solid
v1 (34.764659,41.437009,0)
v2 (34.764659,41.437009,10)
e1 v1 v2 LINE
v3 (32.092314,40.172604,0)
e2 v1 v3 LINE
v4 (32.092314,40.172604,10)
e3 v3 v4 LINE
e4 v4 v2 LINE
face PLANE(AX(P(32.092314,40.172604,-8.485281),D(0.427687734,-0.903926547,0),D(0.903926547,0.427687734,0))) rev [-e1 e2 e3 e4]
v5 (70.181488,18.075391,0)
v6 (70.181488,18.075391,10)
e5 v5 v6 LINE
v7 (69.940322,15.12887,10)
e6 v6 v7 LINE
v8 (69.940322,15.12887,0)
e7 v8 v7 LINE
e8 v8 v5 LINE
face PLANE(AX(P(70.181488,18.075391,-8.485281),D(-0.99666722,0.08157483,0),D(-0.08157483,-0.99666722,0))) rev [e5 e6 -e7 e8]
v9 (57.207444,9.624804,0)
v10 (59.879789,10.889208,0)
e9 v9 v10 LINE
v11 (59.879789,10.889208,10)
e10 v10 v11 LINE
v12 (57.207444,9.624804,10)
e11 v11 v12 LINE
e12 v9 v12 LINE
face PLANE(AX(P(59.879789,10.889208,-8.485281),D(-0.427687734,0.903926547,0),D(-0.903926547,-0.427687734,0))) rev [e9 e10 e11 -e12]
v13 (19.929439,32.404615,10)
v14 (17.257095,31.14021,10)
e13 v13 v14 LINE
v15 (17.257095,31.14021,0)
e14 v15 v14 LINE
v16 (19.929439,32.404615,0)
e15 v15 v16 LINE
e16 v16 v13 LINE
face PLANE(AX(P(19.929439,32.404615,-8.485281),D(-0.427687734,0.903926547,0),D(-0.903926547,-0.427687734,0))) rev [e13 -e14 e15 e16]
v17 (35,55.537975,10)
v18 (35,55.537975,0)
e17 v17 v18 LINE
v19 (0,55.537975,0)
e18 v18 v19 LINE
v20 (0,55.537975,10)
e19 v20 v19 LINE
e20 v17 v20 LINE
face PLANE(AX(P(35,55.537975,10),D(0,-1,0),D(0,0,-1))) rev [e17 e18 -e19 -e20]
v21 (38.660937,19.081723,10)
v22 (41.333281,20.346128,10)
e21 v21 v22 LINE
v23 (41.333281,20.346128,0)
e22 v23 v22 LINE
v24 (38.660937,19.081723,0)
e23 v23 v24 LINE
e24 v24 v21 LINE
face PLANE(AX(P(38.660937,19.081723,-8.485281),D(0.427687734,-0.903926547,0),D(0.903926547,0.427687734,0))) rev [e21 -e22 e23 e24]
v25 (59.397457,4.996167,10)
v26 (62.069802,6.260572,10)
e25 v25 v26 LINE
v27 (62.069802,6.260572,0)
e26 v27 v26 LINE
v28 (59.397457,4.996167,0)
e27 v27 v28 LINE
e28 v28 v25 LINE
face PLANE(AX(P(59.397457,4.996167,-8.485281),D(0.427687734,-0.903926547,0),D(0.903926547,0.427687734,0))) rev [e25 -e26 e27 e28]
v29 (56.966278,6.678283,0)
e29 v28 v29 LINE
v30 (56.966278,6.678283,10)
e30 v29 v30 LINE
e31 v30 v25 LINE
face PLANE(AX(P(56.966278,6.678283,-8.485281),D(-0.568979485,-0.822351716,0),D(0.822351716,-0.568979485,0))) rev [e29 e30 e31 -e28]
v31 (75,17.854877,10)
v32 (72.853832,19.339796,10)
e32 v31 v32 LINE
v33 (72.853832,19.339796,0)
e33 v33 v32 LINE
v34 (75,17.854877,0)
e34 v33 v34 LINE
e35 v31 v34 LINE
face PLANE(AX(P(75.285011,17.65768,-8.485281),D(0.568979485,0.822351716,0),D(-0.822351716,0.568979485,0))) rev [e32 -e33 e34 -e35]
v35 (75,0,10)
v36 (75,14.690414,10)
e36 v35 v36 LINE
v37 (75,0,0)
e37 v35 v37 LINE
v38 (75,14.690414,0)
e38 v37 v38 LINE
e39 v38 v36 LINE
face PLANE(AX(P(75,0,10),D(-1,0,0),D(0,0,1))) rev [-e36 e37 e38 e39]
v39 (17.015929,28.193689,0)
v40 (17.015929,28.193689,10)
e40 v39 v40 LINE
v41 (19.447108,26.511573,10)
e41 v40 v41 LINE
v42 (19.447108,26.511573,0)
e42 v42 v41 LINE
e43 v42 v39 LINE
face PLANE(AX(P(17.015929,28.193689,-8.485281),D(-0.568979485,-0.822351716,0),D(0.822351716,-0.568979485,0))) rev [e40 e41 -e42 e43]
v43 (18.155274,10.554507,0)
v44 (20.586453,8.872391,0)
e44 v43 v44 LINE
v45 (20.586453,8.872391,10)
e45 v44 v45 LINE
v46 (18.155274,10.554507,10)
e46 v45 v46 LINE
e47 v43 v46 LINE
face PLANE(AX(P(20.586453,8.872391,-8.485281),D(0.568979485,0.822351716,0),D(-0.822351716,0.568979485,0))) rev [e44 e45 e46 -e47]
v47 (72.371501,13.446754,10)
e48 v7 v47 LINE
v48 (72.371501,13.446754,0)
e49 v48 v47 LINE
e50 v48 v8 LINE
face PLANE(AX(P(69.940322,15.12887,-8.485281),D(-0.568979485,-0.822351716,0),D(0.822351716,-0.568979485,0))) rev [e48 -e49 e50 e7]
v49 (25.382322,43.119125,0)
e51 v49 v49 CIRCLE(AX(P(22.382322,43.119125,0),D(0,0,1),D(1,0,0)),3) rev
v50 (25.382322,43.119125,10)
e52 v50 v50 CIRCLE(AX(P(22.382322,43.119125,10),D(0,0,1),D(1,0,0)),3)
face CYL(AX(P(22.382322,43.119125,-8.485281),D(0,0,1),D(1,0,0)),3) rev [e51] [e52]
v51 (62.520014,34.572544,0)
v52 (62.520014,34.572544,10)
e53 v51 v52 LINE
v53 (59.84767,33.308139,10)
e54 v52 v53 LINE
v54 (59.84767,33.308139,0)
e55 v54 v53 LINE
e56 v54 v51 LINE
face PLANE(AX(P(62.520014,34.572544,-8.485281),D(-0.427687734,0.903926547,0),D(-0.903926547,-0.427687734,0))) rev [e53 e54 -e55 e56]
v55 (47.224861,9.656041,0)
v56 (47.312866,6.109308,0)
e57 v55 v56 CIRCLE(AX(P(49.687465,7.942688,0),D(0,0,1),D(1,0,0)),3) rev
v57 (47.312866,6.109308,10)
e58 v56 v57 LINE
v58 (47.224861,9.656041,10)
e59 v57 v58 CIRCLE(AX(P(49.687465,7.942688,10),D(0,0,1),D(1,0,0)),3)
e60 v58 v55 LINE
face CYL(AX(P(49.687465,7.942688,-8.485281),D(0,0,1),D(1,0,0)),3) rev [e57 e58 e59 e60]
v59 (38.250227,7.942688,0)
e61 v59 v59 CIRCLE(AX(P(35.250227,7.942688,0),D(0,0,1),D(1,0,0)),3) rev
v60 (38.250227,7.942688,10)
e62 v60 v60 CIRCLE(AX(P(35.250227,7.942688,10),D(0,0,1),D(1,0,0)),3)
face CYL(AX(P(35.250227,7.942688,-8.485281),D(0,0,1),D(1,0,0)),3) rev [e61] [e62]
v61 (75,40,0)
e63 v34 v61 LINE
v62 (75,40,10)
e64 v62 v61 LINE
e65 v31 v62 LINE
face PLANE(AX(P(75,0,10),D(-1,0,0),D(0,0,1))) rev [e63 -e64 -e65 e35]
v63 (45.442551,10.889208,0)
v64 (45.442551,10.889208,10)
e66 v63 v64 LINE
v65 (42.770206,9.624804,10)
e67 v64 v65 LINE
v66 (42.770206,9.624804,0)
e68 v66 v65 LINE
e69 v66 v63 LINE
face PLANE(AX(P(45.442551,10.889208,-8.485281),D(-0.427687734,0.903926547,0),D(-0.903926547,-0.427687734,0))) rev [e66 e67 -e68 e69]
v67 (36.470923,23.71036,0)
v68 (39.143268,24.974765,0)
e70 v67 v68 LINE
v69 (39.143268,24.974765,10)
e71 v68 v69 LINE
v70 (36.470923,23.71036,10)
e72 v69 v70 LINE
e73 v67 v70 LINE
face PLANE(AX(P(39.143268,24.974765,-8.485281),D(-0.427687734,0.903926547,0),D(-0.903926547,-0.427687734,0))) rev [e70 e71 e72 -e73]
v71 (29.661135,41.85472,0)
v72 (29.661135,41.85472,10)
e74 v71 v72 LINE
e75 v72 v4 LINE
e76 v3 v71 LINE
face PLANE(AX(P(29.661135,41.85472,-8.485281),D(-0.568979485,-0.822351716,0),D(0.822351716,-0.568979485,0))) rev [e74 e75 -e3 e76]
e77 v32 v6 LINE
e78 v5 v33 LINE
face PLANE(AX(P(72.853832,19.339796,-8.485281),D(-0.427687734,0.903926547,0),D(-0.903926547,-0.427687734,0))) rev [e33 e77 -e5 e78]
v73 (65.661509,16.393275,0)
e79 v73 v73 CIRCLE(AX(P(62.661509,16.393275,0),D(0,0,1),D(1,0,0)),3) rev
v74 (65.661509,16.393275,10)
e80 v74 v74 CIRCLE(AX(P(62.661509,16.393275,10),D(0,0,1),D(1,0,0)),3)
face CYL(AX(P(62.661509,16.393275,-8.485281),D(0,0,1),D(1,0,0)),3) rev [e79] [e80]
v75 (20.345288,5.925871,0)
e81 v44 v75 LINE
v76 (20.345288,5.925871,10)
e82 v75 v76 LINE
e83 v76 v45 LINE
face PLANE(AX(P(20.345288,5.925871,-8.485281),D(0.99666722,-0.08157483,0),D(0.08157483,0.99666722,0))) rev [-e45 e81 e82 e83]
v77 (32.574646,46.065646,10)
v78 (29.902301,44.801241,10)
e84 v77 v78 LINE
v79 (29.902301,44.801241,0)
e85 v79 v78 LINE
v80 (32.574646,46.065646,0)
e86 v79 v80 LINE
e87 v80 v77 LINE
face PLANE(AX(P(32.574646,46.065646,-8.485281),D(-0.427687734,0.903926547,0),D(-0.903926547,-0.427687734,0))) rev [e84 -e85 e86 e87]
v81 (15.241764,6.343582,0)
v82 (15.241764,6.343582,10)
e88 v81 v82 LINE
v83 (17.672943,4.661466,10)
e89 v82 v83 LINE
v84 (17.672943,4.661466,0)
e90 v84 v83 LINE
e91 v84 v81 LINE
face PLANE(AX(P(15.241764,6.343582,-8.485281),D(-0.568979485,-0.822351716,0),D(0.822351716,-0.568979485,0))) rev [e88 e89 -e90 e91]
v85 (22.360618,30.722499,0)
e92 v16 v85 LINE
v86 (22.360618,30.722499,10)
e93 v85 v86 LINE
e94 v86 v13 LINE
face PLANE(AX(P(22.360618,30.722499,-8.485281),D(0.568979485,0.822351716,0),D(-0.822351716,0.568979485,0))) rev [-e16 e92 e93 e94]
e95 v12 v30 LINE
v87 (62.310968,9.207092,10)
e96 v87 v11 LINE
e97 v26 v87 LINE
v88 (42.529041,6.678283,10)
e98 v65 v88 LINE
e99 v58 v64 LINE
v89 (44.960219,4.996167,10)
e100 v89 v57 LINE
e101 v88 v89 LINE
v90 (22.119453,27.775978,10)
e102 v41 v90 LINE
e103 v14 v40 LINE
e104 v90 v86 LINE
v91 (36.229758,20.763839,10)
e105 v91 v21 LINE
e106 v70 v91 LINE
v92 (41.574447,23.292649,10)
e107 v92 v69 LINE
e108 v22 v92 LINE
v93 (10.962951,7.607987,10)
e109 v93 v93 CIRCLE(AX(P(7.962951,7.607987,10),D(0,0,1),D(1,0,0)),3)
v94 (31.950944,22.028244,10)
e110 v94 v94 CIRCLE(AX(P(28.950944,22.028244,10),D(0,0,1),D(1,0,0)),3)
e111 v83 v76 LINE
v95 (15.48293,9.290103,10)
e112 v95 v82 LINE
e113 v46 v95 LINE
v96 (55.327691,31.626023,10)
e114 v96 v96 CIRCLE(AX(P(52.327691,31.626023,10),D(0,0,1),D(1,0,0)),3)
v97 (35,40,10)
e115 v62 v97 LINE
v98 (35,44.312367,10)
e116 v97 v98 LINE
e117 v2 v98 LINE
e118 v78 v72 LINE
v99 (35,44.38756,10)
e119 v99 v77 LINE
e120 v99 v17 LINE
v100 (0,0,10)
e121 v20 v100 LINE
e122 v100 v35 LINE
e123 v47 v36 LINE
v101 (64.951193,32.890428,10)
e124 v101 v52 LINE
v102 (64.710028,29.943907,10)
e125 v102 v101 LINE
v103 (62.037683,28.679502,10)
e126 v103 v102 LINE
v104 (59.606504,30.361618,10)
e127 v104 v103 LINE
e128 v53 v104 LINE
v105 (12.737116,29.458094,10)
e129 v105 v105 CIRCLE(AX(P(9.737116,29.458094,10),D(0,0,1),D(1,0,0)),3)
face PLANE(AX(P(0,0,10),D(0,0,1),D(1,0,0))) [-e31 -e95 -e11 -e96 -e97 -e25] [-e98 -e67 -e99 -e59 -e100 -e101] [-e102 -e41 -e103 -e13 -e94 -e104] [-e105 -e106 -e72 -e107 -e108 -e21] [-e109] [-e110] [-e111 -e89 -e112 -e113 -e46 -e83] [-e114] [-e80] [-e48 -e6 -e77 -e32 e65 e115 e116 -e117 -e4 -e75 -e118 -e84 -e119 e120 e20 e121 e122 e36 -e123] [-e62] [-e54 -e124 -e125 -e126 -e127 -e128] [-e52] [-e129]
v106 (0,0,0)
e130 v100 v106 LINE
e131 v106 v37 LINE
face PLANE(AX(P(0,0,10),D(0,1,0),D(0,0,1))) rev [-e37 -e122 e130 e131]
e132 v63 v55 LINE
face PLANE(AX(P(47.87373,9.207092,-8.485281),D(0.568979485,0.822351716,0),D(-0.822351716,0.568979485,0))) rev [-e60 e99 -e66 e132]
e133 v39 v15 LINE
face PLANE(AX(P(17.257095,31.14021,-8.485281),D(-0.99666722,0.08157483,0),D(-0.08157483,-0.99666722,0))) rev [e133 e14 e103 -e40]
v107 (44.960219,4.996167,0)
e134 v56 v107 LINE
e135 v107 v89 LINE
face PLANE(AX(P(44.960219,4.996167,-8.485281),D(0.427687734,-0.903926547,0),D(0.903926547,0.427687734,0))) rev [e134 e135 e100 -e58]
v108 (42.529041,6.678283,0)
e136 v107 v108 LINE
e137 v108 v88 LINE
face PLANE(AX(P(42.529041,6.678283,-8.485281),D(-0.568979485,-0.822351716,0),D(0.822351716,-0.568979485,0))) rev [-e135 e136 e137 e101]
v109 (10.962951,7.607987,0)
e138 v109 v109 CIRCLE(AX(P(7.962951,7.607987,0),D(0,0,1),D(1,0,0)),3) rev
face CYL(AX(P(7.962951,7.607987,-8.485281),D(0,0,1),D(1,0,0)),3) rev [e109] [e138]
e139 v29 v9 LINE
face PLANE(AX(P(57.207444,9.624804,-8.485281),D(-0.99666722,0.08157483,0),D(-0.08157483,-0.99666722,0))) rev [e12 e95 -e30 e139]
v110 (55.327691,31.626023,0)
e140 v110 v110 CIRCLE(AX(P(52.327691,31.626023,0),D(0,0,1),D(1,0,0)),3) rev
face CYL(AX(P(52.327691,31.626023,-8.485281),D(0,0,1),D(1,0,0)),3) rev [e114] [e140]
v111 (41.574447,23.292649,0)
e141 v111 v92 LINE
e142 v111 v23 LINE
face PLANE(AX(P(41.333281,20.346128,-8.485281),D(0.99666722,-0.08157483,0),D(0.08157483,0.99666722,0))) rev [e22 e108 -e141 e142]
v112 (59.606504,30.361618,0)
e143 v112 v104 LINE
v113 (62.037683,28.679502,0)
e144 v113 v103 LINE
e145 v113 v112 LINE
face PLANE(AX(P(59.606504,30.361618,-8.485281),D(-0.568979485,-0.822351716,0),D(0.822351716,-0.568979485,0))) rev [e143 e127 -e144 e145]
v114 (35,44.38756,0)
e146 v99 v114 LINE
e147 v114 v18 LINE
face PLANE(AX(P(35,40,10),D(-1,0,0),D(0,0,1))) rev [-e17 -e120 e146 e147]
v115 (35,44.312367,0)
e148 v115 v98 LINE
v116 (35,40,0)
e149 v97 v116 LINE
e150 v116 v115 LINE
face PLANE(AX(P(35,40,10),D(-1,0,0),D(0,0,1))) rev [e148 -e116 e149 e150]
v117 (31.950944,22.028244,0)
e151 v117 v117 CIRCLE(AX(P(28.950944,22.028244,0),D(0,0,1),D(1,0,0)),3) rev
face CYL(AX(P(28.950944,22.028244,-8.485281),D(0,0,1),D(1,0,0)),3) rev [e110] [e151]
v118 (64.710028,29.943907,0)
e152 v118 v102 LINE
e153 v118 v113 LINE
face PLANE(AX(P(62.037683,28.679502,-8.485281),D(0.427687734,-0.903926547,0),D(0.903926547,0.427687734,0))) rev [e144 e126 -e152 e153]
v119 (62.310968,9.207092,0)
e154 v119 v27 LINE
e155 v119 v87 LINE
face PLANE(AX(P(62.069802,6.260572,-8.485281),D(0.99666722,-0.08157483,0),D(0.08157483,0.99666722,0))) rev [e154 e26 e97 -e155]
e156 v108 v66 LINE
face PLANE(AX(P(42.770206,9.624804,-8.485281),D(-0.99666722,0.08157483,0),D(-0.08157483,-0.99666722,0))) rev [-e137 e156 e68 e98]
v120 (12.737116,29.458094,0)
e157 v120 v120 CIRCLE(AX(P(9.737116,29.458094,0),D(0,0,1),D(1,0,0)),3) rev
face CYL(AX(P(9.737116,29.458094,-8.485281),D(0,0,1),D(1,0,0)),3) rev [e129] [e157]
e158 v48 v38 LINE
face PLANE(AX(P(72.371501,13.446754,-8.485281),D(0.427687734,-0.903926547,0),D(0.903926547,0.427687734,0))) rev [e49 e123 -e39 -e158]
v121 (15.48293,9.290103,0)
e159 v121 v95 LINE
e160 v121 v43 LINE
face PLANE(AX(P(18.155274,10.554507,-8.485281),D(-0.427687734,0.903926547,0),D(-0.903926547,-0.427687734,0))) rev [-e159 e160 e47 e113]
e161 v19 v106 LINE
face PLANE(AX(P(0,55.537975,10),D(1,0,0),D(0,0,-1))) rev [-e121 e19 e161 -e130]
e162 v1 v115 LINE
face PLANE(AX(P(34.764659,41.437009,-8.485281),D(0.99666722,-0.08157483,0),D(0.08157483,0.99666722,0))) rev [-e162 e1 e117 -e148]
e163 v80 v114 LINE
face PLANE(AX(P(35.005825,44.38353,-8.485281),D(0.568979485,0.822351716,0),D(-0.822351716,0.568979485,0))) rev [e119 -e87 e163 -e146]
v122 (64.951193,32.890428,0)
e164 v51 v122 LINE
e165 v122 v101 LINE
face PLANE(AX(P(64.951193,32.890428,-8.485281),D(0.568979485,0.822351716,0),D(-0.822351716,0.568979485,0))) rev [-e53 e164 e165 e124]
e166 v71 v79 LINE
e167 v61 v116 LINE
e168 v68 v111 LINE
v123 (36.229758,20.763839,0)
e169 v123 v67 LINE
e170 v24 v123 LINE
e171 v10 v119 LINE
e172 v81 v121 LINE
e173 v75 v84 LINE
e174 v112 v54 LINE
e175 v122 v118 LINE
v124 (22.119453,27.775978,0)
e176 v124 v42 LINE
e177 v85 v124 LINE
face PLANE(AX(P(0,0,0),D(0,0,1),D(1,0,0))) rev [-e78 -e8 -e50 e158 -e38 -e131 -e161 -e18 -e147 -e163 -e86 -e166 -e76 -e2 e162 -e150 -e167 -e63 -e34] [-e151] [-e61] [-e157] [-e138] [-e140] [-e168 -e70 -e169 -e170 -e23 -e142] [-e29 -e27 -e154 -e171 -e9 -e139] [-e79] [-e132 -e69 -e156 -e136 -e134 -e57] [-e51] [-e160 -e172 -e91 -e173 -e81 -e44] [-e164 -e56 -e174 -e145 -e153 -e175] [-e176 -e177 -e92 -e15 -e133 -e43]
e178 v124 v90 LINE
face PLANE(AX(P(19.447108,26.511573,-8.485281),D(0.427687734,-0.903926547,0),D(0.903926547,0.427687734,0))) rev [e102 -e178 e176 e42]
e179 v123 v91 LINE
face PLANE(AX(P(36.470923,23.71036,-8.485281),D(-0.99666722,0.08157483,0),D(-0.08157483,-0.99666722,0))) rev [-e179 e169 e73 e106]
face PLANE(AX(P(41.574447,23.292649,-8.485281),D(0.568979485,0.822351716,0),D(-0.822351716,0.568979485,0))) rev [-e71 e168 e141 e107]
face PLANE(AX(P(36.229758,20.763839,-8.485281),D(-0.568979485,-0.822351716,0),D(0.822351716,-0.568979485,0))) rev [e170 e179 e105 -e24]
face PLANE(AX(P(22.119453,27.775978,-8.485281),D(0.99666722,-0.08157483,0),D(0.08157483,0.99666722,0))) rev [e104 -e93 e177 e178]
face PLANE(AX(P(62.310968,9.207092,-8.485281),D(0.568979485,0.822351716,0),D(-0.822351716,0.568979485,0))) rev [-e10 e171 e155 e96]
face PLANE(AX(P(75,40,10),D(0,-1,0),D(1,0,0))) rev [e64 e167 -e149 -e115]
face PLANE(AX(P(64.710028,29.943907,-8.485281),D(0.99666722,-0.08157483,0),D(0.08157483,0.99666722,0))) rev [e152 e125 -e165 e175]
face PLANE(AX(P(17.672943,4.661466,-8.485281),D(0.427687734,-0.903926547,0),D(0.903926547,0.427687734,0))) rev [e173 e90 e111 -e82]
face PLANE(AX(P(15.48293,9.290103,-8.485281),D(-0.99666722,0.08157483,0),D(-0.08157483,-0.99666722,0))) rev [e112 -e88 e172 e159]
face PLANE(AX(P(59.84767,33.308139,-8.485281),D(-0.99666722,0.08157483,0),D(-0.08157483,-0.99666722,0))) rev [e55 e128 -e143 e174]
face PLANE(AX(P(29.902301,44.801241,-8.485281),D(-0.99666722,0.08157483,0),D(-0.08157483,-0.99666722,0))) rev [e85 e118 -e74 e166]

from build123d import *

# Parameters (mm, degrees)
BOSS_EXTRUDE1_DEPTH       = 10
SKETCH2_R                 = 3
CUT_EXTRUDE1_DEPTH        = 10
SKETCH_PATTERN1_OUTLINE_R = 3
SKETCH_PATTERN1_DEPTH     = 10


# Read off the part's stored shape, not the designer's step: Sketch-Pattern1
with BuildPart() as part:
    # Sketch1 → Boss-Extrude1 (new body)
    with BuildSketch(Plane.XY):
        Polygon((0, 0), (75, 0), (75, 40), (35, 40), (35, 55.537974684), (0, 55.537974684), align=None)
    extrude(amount=BOSS_EXTRUDE1_DEPTH)

    # Sketch2 → Cut-Extrude1 (cut)
    with BuildSketch(Plane.XY.offset(10)):
        with Locations((7.962950949, 7.607986586)):
            Circle(SKETCH2_R)
        Polygon((20.345287783, 5.925870596), (20.586453467, 8.872391359), (18.155274475, 10.55450735), (15.482929799, 9.290102577), (15.241764115, 6.343581814), (17.672943107, 4.661465823), align=None)
    extrude(amount=-CUT_EXTRUDE1_DEPTH, mode=Mode.SUBTRACT)

    # Sketch-Pattern1 outline → Sketch-Pattern1 (cut)
    with BuildSketch(Plane.XY):
        with Locations((9.737115818, 29.458094158)):
            Circle(SKETCH_PATTERN1_OUTLINE_R)
        with Locations((52.327690787, 31.62602284)):
            Circle(SKETCH_PATTERN1_OUTLINE_R)
        Polygon((36.229757623, 20.763839411), (38.660936615, 19.08172342), (41.333281291, 20.346128193), (41.574446975, 23.292648956), (39.143267983, 24.974764947), (36.470923307, 23.710360174), align=None)
        with Locations((28.950944457, 22.028244183)):
            Circle(SKETCH_PATTERN1_OUTLINE_R)
        Polygon((35, 44.312366767), (35, 44.387559798), (32.574645536, 46.065645838), (29.90230086, 44.801241065), (29.661135176, 41.854720302), (32.092314168, 40.172604311), (34.764658844, 41.437009084), align=None)
        with Locations((22.38232201, 43.119125074)):
            Circle(SKETCH_PATTERN1_OUTLINE_R)
        Polygon((17.015928983, 28.193689386), (19.447107975, 26.511573395), (22.119452651, 27.775978168), (22.360618335, 30.722498931), (19.929439343, 32.404614922), (17.257094667, 31.140210149), align=None)
        Polygon((59.606503953, 30.361618067), (62.037682945, 28.679502076), (64.710027621, 29.943906849), (64.951193305, 32.890427612), (62.520014313, 34.572543603), (59.847669637, 33.30813883), align=None)
        with Locations((62.661508703, 16.393274831)):
            Circle(SKETCH_PATTERN1_OUTLINE_R)
        Polygon((69.940321868, 15.128870058), (72.37150086, 13.446754067), (75, 14.690413573), (75, 17.854876903), (72.853832228, 19.339795594), (70.181487552, 18.075390822), align=None)
        with Locations((35.250227337, 7.942687663)):
            Circle(SKETCH_PATTERN1_OUTLINE_R)
        Polygon((56.966278334, 6.67828289), (59.397457326, 4.996166899), (62.069802002, 6.260571672), (62.310967686, 9.207092435), (59.879788694, 10.889208426), (57.207444018, 9.624803653), align=None)
        with BuildLine():
            Line((44.960219495, 4.996166899), (47.312866175, 6.109308373))
            ThreePointArc((47.312866175, 6.109308373), (52.686542056, 8.017104238), (47.224860539, 9.656040644))
            Line((47.224860539, 9.656040644), (45.442550863, 10.889208426))
            Line((45.442550863, 10.889208426), (42.770206187, 9.624803653))
            Line((42.770206187, 9.624803653), (42.529040503, 6.67828289))
            Line((42.529040503, 6.67828289), (44.960219495, 4.996166899))
        make_face()
    extrude(amount=SKETCH_PATTERN1_DEPTH, mode=Mode.SUBTRACT)


solid = part.part
